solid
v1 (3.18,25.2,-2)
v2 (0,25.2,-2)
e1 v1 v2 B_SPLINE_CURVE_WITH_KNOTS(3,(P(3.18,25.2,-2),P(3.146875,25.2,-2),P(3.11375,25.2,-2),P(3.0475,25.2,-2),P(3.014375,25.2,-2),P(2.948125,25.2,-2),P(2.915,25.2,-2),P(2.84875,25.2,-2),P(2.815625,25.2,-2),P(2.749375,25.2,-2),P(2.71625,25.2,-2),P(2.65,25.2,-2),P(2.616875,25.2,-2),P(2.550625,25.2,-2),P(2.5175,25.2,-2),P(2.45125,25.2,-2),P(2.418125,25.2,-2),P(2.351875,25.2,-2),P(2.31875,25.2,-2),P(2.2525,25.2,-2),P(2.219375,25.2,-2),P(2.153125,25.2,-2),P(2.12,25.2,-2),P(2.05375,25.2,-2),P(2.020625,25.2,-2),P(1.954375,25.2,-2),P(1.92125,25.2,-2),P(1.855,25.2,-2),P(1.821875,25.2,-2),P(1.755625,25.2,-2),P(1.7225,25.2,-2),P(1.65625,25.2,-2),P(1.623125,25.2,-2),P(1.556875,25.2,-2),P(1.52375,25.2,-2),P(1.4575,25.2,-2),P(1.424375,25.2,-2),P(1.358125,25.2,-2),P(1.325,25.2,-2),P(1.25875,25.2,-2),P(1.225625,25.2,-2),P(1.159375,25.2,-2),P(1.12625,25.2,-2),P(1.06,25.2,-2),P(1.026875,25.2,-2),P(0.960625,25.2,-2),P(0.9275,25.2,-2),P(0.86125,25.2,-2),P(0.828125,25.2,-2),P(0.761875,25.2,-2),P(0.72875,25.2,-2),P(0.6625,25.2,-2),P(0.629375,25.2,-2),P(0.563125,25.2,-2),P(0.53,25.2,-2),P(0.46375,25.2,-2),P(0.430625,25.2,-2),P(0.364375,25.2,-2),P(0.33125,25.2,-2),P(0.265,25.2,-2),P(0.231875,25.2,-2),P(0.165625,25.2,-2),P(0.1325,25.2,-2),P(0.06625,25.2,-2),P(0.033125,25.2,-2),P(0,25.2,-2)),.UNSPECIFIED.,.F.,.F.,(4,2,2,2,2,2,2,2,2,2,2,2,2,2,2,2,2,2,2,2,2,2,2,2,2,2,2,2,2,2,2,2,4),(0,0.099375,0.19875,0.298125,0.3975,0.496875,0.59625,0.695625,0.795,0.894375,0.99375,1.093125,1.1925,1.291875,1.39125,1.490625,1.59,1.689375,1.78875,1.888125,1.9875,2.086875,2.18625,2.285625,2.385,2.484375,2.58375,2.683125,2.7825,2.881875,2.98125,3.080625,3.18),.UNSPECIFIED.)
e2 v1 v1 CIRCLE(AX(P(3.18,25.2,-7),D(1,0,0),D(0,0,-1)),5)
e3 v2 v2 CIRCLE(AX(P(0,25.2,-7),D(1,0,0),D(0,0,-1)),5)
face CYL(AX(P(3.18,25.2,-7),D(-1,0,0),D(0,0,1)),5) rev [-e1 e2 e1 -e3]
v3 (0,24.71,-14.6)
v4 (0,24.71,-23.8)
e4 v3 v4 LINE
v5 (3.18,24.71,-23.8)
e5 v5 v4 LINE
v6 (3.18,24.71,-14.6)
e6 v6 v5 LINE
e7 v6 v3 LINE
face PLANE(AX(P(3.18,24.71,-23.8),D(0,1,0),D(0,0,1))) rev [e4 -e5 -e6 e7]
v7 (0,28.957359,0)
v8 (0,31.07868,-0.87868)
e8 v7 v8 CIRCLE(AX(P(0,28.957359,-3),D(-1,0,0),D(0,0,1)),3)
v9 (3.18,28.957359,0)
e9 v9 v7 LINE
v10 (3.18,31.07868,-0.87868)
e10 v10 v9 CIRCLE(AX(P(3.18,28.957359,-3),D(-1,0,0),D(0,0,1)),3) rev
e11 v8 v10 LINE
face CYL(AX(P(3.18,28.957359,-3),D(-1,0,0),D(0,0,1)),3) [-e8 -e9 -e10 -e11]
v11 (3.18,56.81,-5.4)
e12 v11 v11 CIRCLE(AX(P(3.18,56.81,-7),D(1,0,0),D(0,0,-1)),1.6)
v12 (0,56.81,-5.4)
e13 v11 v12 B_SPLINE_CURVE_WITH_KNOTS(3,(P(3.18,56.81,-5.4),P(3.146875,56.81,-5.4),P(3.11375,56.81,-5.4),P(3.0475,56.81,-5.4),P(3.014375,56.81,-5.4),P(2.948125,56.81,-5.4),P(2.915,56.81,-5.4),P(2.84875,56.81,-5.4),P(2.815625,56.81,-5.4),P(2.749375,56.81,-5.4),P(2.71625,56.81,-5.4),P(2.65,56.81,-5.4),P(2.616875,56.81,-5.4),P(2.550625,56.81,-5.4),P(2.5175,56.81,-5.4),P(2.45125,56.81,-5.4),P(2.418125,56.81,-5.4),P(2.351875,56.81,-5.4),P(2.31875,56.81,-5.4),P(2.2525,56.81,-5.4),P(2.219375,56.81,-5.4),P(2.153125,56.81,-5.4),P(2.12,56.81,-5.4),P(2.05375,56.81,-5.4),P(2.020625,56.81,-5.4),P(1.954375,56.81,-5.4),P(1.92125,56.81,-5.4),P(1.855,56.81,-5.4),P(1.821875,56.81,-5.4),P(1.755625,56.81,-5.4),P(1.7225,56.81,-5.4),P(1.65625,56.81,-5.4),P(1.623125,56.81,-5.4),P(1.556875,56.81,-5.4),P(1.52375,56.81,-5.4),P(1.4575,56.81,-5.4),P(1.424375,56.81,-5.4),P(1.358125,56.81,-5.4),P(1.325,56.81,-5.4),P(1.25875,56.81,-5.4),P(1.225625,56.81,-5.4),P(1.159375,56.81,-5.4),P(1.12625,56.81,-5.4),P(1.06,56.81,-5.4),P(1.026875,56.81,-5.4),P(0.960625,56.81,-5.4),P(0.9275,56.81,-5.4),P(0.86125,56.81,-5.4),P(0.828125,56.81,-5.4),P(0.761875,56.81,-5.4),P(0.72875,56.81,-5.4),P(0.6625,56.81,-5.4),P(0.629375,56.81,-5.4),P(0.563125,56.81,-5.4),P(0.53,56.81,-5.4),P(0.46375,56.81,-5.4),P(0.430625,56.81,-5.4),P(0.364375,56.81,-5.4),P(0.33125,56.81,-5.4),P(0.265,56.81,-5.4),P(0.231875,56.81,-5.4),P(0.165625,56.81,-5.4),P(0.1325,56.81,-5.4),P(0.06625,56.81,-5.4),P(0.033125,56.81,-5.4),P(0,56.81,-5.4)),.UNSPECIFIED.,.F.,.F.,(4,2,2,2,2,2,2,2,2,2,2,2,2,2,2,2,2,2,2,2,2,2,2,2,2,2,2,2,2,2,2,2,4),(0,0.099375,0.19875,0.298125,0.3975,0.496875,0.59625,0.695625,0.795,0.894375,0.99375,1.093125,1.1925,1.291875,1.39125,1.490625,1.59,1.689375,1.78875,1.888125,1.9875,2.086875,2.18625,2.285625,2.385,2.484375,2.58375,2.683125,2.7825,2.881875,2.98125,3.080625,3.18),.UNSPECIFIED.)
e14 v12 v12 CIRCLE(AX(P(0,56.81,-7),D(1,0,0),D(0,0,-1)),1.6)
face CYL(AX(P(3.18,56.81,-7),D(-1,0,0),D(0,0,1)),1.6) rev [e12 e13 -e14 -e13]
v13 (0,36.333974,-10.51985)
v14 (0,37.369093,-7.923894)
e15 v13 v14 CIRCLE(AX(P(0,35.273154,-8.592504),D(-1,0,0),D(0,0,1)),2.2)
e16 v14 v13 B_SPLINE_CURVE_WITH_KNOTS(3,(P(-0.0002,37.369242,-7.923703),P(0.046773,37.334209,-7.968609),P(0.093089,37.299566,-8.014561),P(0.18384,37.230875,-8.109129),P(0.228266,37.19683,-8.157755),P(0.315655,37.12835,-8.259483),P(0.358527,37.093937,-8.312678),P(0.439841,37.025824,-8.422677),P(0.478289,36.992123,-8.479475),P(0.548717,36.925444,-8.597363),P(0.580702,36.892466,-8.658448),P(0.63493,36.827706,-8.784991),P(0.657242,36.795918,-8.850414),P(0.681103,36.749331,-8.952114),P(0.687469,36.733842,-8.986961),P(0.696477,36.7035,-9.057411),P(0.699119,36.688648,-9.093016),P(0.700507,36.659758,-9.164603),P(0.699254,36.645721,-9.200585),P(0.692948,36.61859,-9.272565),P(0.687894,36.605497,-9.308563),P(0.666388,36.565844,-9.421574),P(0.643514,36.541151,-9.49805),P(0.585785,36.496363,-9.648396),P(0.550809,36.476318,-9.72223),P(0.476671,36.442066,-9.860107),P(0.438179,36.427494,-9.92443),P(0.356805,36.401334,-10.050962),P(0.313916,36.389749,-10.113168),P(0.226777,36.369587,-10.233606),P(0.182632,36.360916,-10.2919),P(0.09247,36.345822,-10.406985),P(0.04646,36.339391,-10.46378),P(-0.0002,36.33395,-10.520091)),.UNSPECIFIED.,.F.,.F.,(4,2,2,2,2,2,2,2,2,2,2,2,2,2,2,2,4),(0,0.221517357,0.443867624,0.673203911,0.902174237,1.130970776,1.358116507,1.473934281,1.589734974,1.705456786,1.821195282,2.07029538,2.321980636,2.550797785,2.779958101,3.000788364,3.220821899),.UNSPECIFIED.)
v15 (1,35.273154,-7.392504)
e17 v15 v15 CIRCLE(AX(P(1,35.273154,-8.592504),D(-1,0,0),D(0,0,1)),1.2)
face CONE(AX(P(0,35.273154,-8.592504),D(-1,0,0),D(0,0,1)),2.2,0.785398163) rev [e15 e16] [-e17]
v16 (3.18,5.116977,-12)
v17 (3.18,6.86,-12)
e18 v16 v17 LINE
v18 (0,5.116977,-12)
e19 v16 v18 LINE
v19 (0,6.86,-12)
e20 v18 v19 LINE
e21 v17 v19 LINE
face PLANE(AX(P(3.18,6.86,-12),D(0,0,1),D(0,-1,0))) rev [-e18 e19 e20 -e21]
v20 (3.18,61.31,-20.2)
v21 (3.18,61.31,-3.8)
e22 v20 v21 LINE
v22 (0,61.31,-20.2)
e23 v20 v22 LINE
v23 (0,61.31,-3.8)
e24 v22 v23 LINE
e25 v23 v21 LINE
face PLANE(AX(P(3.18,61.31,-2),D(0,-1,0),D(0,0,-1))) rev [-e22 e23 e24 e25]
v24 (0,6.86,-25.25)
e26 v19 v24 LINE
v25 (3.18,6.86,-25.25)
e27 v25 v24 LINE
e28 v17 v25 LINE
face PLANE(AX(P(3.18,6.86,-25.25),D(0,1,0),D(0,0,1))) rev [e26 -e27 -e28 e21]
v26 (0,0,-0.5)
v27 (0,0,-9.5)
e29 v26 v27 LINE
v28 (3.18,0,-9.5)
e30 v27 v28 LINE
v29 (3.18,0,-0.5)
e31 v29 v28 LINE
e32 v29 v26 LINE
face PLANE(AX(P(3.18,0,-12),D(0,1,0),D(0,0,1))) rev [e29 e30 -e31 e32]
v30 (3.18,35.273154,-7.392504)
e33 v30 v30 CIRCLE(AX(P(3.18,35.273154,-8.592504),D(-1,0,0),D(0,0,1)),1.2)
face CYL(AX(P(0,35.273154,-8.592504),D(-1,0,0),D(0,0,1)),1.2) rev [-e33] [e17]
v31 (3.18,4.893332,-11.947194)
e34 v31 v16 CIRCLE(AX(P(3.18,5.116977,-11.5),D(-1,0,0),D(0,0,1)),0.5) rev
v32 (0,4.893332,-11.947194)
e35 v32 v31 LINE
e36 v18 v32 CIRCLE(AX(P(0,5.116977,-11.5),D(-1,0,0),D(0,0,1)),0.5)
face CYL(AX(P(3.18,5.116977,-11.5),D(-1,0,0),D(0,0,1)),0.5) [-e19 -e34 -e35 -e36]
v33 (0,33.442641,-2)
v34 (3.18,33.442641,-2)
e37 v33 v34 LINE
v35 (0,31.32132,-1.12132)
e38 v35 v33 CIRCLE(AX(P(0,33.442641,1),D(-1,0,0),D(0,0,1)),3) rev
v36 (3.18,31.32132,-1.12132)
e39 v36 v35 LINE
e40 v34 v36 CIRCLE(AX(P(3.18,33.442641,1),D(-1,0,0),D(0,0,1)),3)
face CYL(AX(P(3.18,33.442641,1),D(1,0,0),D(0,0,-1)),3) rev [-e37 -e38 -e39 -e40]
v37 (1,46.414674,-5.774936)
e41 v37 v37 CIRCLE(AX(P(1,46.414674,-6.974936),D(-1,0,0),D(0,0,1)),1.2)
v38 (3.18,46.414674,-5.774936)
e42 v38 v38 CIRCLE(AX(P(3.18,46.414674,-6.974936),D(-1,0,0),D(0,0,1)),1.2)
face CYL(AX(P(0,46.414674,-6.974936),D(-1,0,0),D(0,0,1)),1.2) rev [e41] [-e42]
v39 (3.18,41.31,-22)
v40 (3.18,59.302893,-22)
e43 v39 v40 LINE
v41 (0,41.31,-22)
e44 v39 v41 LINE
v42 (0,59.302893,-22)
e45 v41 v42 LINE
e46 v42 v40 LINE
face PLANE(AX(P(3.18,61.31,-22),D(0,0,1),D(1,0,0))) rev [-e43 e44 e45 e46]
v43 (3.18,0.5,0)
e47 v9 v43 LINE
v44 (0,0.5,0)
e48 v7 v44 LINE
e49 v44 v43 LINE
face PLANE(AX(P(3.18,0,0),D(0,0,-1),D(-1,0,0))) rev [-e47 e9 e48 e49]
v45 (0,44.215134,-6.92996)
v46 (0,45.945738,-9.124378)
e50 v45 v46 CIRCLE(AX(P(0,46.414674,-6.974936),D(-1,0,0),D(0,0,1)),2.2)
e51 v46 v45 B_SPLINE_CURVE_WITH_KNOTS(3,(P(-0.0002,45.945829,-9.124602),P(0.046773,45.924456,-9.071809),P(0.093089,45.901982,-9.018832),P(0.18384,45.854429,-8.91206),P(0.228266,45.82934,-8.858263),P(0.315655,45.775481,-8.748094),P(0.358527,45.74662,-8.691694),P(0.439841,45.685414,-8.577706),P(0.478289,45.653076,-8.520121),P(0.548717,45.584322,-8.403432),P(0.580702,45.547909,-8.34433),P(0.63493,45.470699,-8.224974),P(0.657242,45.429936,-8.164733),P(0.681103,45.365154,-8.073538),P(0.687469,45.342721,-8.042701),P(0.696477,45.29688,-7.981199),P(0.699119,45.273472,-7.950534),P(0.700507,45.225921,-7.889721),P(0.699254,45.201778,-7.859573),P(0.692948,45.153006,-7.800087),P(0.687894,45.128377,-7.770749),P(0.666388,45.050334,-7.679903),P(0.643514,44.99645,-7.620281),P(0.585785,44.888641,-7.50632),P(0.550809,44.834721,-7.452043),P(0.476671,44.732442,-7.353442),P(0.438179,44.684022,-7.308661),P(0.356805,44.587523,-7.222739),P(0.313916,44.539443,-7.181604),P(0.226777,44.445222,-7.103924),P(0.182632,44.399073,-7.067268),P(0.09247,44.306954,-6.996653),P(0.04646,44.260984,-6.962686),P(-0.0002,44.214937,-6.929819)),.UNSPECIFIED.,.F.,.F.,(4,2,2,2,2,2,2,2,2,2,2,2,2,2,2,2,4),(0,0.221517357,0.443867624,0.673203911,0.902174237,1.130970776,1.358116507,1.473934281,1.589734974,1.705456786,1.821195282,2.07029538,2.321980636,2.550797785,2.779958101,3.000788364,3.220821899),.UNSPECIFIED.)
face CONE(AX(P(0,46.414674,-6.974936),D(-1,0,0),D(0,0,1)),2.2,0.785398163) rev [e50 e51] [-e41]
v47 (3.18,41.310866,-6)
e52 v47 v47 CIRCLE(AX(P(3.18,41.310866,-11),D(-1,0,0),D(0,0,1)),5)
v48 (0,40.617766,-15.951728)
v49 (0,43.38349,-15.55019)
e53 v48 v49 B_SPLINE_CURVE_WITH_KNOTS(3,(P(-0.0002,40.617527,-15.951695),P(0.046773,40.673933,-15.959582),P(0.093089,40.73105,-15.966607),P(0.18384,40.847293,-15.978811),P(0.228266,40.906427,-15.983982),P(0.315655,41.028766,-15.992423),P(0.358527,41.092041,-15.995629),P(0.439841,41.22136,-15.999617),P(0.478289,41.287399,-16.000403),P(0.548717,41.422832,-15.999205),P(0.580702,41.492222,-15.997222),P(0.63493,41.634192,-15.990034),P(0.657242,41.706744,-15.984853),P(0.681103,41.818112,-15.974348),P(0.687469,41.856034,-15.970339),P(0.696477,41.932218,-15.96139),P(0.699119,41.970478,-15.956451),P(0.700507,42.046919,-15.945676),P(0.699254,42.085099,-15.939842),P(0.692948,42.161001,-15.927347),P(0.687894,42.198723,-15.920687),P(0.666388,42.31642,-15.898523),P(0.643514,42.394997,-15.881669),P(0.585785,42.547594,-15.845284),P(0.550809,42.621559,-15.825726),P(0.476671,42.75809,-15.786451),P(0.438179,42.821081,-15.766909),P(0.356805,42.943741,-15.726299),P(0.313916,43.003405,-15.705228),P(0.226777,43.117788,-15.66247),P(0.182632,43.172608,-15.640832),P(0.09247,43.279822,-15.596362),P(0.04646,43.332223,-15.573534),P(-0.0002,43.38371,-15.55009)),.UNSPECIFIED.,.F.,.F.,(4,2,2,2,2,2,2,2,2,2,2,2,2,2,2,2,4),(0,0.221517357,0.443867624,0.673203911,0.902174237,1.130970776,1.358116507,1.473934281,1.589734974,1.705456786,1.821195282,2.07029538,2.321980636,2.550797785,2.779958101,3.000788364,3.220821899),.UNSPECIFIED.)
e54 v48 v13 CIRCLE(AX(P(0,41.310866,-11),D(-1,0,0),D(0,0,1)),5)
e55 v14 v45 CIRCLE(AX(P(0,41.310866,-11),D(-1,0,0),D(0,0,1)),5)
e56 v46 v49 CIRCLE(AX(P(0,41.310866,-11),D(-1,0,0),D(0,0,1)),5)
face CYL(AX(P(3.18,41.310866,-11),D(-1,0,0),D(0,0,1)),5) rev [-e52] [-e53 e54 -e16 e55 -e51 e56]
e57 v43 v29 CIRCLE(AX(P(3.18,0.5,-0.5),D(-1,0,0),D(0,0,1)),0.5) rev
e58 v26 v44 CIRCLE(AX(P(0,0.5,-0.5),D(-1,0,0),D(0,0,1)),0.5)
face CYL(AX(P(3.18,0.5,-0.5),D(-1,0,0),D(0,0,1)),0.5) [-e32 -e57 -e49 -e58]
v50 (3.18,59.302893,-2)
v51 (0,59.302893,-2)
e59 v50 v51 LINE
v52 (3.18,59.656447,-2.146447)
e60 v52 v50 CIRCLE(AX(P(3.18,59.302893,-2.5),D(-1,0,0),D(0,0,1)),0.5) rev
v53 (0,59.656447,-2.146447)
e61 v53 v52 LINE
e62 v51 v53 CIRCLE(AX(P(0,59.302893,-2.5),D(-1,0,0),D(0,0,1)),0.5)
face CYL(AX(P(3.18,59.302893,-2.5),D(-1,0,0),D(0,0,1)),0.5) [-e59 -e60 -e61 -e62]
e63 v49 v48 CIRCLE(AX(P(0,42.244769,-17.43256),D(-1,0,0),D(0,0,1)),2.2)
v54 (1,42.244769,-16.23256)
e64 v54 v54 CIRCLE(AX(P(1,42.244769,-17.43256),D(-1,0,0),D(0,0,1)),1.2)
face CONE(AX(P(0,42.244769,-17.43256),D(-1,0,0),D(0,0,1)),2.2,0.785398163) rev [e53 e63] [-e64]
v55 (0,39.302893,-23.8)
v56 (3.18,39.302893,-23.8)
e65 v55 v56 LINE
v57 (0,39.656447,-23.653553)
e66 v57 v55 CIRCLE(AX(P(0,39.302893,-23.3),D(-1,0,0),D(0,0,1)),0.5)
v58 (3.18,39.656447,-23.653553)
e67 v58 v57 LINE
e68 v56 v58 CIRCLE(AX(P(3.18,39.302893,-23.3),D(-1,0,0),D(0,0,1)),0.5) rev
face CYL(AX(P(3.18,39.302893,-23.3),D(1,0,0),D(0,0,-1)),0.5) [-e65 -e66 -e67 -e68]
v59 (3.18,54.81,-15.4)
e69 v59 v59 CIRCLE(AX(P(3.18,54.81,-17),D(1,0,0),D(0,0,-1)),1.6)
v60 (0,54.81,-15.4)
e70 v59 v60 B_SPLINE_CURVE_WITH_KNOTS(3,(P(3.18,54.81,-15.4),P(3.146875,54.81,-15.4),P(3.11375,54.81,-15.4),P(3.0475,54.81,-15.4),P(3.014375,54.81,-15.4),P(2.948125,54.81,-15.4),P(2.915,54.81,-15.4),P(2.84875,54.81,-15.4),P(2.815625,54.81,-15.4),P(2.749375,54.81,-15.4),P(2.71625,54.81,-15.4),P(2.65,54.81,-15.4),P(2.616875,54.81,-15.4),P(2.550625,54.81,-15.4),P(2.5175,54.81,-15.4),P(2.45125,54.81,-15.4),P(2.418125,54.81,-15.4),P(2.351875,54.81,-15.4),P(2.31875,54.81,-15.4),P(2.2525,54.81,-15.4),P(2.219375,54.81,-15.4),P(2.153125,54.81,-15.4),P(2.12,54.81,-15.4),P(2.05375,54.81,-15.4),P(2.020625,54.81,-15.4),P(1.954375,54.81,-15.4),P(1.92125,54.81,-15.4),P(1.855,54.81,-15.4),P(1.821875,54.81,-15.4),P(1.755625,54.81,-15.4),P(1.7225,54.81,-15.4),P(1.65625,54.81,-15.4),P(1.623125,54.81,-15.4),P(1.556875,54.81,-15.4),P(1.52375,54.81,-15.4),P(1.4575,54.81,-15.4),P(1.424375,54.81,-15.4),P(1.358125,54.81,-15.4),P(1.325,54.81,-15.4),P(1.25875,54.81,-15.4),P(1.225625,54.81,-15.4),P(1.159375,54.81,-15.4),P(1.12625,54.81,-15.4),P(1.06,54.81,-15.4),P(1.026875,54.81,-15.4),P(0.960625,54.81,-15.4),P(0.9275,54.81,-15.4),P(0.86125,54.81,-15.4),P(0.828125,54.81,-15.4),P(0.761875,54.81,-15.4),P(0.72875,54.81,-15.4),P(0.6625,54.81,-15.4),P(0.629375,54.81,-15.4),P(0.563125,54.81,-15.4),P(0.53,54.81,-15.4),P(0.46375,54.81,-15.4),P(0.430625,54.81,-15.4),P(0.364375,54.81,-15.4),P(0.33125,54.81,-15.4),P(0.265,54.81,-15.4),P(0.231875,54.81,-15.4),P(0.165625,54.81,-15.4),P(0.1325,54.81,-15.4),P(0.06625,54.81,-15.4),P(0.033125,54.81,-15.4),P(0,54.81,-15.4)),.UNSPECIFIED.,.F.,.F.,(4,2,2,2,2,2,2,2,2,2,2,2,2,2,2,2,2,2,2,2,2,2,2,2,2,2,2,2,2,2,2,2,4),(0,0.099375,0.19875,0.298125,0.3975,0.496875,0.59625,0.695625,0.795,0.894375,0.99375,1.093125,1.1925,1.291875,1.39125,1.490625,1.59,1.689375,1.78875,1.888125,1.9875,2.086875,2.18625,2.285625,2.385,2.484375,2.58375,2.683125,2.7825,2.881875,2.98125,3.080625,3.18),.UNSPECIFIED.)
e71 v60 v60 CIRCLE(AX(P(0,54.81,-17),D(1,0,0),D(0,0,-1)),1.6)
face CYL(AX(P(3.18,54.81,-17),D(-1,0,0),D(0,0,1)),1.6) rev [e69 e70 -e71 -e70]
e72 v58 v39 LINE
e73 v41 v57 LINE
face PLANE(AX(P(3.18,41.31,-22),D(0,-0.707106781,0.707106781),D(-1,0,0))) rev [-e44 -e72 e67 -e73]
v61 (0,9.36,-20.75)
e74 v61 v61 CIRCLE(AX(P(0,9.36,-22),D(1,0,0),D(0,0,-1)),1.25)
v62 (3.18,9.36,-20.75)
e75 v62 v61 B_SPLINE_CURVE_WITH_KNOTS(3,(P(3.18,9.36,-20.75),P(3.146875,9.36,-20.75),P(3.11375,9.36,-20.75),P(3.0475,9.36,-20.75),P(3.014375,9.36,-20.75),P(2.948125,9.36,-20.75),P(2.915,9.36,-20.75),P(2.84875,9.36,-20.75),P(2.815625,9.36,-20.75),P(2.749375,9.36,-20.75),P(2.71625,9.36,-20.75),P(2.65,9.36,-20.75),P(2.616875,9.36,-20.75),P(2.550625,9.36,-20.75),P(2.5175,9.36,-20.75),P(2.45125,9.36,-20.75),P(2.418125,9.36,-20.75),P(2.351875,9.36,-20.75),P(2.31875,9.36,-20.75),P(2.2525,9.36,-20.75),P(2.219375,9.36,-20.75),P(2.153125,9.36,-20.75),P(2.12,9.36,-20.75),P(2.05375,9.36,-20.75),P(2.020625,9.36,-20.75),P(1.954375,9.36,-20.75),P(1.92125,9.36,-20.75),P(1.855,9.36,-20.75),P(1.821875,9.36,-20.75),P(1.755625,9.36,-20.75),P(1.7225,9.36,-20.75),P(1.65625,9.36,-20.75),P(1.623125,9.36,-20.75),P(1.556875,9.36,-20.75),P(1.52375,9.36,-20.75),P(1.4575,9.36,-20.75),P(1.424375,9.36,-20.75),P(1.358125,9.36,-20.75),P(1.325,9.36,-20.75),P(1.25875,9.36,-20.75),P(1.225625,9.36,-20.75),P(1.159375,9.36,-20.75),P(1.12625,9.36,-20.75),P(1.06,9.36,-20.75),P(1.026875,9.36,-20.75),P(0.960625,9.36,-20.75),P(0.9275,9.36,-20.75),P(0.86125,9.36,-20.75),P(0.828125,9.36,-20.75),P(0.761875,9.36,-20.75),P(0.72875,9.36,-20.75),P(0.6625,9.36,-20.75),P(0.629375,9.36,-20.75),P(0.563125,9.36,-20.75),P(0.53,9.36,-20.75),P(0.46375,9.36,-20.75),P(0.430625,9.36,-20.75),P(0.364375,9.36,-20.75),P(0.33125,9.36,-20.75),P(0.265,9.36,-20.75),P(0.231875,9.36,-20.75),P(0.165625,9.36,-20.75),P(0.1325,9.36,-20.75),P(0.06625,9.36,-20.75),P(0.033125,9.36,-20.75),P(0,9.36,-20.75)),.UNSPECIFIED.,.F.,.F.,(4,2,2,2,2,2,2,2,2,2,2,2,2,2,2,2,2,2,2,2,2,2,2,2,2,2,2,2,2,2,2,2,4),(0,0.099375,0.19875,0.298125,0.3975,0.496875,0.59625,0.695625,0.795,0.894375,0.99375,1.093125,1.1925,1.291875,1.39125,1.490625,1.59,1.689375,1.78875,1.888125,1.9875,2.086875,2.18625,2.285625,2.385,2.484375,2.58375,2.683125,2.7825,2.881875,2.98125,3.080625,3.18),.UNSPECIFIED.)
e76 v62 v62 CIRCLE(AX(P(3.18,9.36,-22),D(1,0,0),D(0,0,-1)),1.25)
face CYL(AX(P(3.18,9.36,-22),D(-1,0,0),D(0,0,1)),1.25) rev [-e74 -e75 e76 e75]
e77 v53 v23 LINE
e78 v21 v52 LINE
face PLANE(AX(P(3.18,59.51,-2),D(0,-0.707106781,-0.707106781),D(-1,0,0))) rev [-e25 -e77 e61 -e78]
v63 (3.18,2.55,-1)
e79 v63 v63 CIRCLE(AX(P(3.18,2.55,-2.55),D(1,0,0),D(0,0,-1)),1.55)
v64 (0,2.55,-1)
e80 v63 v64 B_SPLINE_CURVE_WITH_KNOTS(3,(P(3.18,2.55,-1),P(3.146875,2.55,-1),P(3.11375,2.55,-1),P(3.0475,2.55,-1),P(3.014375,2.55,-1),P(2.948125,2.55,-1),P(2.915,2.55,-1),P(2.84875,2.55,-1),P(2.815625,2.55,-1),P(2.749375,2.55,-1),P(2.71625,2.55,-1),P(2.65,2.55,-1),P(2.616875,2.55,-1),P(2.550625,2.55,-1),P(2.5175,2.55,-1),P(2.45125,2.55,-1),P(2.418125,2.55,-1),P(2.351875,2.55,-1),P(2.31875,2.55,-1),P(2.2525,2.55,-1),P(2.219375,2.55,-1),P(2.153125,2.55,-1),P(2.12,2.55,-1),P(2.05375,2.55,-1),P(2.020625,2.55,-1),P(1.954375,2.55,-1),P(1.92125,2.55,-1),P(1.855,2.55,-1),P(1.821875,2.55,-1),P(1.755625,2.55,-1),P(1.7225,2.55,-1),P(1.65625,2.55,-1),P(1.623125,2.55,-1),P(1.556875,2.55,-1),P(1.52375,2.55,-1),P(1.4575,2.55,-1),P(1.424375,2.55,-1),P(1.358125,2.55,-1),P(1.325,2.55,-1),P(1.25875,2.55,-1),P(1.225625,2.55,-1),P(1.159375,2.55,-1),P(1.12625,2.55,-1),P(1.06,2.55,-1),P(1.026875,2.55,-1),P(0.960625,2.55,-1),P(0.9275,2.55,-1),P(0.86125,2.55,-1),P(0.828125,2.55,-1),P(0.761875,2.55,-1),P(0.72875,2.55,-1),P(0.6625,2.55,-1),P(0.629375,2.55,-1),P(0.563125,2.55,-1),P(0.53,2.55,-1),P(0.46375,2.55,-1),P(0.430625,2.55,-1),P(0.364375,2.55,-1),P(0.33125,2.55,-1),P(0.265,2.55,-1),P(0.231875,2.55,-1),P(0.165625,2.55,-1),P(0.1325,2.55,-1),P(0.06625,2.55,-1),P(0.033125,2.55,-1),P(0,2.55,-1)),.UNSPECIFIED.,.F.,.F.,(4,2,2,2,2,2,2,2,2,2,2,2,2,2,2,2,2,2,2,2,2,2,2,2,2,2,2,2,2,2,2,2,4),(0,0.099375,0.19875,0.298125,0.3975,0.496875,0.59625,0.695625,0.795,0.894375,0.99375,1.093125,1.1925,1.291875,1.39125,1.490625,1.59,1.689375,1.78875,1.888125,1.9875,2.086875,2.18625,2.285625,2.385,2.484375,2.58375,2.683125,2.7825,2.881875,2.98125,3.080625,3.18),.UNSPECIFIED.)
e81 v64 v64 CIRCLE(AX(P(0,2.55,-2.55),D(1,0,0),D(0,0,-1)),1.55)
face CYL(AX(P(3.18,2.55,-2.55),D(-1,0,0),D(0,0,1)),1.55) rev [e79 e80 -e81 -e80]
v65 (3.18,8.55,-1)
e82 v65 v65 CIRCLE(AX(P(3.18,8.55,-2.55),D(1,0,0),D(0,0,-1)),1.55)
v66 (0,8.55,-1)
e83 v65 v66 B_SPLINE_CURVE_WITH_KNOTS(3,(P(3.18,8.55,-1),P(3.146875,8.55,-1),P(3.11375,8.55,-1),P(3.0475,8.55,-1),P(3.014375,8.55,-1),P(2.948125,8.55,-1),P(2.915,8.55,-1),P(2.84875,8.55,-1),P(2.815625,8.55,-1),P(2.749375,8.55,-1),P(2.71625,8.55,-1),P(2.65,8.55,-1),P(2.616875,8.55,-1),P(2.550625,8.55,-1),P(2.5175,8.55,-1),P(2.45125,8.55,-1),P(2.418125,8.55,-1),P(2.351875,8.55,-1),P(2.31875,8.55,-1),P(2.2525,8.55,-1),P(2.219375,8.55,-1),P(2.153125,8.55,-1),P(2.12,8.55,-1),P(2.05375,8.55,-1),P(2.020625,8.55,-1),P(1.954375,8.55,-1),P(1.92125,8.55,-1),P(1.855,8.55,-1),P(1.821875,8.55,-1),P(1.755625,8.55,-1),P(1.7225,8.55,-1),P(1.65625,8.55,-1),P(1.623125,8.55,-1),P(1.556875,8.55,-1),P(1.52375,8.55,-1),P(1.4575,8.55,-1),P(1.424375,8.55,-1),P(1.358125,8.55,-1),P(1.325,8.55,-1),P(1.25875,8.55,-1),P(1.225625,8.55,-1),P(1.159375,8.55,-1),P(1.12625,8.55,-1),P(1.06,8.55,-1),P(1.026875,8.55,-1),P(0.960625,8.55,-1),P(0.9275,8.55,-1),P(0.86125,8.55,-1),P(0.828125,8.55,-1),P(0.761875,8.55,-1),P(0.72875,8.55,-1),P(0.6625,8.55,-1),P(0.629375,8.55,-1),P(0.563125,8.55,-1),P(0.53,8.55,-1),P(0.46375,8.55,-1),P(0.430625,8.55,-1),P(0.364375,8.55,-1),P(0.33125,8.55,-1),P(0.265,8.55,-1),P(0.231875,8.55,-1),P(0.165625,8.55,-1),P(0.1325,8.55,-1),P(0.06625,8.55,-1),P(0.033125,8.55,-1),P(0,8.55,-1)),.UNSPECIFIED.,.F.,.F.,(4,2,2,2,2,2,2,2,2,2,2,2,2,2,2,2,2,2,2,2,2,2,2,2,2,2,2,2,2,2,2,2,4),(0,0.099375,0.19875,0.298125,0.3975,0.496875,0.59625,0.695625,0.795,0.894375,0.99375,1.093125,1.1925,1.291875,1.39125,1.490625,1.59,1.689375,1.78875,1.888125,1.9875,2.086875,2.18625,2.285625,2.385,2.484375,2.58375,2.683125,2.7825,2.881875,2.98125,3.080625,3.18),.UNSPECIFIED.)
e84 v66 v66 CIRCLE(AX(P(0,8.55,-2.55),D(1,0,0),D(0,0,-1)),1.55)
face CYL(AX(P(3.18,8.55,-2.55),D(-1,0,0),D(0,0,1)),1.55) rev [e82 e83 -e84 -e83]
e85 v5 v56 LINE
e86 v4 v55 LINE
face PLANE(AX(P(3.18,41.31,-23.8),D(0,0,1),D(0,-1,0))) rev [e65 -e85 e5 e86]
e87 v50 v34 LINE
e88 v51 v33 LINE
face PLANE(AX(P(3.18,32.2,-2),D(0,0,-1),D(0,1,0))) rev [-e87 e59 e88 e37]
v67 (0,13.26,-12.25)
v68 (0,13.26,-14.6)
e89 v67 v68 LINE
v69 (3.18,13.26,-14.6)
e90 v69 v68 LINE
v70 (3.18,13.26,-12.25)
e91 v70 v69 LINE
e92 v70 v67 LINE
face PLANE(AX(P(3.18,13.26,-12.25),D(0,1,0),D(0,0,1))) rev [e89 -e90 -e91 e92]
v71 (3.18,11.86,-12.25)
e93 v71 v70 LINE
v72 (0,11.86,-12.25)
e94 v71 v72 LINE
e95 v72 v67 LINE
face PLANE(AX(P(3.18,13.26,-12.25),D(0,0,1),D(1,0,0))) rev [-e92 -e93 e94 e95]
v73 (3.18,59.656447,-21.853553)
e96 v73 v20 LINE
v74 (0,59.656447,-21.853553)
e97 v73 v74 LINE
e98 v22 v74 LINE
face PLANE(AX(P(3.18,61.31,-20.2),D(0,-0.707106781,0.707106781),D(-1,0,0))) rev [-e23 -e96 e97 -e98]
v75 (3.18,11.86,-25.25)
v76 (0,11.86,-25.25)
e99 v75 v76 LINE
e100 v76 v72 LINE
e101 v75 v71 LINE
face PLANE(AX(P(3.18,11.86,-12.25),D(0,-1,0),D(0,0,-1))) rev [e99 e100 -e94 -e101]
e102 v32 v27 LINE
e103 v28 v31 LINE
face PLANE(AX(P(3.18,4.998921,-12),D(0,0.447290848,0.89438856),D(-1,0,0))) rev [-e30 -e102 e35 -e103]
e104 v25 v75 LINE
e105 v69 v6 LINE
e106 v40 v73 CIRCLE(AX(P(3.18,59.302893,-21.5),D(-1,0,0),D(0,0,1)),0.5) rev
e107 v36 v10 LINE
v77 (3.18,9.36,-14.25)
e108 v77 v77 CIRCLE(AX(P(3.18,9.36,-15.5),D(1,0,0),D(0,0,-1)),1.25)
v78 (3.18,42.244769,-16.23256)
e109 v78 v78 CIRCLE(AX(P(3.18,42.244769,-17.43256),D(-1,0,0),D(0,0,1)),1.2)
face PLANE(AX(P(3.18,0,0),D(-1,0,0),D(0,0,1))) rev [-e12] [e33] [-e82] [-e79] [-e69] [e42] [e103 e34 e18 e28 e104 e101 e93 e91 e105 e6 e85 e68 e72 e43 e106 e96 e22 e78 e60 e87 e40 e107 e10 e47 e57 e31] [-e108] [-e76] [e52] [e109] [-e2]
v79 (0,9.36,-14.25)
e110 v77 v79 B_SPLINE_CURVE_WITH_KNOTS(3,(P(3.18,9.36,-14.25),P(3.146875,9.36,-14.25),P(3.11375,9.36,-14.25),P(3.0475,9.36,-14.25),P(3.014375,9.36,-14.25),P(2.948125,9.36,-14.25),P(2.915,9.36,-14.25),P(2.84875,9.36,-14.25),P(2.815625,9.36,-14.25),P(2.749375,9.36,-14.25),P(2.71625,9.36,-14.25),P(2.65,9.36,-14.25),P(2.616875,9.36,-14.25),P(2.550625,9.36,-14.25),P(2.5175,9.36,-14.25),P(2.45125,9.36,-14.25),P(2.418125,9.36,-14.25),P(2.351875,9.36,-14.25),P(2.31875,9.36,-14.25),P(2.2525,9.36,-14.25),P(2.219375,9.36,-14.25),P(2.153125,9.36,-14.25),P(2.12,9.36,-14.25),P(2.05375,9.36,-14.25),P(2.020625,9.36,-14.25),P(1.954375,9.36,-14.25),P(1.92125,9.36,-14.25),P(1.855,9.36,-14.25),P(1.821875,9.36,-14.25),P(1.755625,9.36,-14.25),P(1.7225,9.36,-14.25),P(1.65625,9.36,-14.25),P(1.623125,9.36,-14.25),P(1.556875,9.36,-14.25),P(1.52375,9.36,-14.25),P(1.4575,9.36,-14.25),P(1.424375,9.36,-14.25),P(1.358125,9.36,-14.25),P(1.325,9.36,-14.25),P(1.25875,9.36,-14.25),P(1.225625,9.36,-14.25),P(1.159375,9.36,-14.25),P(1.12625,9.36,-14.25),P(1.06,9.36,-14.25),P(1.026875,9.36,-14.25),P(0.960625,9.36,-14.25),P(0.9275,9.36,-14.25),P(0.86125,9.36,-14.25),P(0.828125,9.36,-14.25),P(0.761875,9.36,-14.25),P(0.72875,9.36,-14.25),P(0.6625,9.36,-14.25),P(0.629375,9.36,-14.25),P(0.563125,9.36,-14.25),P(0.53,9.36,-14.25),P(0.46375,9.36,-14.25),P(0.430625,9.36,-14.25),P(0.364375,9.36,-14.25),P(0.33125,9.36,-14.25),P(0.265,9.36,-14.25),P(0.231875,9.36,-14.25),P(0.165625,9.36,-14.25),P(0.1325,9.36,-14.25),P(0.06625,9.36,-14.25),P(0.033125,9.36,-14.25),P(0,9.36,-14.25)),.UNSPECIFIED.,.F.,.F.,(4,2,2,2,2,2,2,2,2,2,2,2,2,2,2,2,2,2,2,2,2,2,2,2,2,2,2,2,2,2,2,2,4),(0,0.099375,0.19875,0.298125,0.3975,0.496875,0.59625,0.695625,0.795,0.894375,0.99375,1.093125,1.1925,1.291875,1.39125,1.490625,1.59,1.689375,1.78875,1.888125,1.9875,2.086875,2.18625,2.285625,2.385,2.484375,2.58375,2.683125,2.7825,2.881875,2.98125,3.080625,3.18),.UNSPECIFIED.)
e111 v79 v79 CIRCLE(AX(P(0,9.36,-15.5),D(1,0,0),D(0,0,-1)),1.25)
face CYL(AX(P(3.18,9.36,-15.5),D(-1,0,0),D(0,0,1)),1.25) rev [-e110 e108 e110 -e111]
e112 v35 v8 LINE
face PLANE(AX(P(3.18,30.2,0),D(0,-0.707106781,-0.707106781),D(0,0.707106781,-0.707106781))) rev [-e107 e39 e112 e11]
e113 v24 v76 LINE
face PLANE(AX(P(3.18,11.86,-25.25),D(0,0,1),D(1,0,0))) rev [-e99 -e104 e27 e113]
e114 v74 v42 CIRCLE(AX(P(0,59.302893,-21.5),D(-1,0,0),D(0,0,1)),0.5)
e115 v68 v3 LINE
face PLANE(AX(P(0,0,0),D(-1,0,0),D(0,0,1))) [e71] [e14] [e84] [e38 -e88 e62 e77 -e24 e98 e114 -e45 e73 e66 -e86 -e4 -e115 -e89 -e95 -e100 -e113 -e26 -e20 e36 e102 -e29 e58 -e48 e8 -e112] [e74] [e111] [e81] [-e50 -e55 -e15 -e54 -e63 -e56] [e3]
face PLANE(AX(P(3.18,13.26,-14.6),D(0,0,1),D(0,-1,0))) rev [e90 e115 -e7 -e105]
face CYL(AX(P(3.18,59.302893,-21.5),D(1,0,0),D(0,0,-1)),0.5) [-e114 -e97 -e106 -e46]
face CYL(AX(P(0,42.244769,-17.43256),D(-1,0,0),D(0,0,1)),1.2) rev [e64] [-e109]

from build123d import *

# Parameters (mm, degrees)
SKETCH1_R                                       = 5
SKETCH1_R_2                                     = 1.6
SKETCH1_R_3                                     = 1.25
SKETCH1_R_4                                     = 1.55
BOSS_EXTRUDE1_DEPTH                             = 3.18
CHAMFER1_SIZE                                   = 2.5
CHAMFER1_SIZE2                                  = 4.998920521
CSK_FOR_M2_FLAT_HEAD_MACHINE_SCREW1_D           = 2.4
CSK_FOR_M2_FLAT_HEAD_MACHINE_SCREW1_DEPTH       = 3.508967257
CSK_FOR_M2_FLAT_HEAD_MACHINE_SCREW1_CSINK_D     = 4.4
CSK_FOR_M2_FLAT_HEAD_MACHINE_SCREW1_CSINK_ANGLE = 90
CSK_FOR_M2_FLAT_HEAD_MACHINE_SCREW1_TIP         = 0.721032743
SKETCH3_R                                       = 5
CUT_EXTRUDE4_DEPTH                              = 67.382158748
FILLET2_R                                       = 3
CHAMFER2_SIZE                                   = 1.8
FILLET4_R                                       = 0.5


with BuildPart() as part:
    # Sketch1 → Boss-Extrude1 (new body)
    with BuildSketch(Plane(origin=(0, 0, 0), x_dir=(0, 0, -1), z_dir=(1, 0, 0))):
        Polygon((0, 0), (0, 30.2), (2, 32.2), (2, 61.31), (22, 61.31), (22, 41.31), (23.8, 41.31), (23.8, 24.71), (14.6, 24.71), (14.6, 13.26), (12.25, 13.26), (12.25, 11.86), (25.25, 11.86), (25.25, 6.86), (12, 6.86), (12, 0), align=None)
        with Locations(Location((7, 25.2, 0), (0, 0, 180))):
            Circle(SKETCH1_R, mode=Mode.SUBTRACT)
        with Locations(Location((7, 56.81, 0), (0, 0, 180))):
            Circle(SKETCH1_R_2, mode=Mode.SUBTRACT)
        with Locations(Location((17, 54.81, 0), (0, 0, 180))):
            Circle(SKETCH1_R_2, mode=Mode.SUBTRACT)
        with Locations(Location((22, 9.36, 0), (0, 0, 180))):
            Circle(SKETCH1_R_3, mode=Mode.SUBTRACT)
        with Locations(Location((15.5, 9.36, 0), (0, 0, 180))):
            Circle(SKETCH1_R_3, mode=Mode.SUBTRACT)
        with Locations(Location((2.55, 2.55, 0), (0, 0, 180))):
            Circle(SKETCH1_R_4, mode=Mode.SUBTRACT)
        with Locations(Location((2.55, 8.55, 0), (0, 0, 180))):
            Circle(SKETCH1_R_4, mode=Mode.SUBTRACT)
    extrude(amount=BOSS_EXTRUDE1_DEPTH)

    # Chamfer1
    chamfer1_edges = [part.edges().sort_by_distance(p)[0] for p in [
        (1.59, 0, -12),
    ]]
    chamfer1_side = [part.faces().sort_by_distance(p)[0] for p in [
        (1.59, 0, -6),
    ]]
    chamfer(chamfer1_edges, length=CHAMFER1_SIZE, length2=CHAMFER1_SIZE2, reference=chamfer1_side[0])

    # CSK for M2 Flat Head Machine Screw1
    with Locations(Plane.ZY):
        with Locations((-6.974936087, 46.414674329), (-17.432559713, 42.244769284), (-8.592504199, 35.273154083)):
            CounterSinkHole(CSK_FOR_M2_FLAT_HEAD_MACHINE_SCREW1_D / 2, CSK_FOR_M2_FLAT_HEAD_MACHINE_SCREW1_CSINK_D / 2, depth=CSK_FOR_M2_FLAT_HEAD_MACHINE_SCREW1_DEPTH, counter_sink_angle=CSK_FOR_M2_FLAT_HEAD_MACHINE_SCREW1_CSINK_ANGLE)
            with Locations((0, 0, -(CSK_FOR_M2_FLAT_HEAD_MACHINE_SCREW1_DEPTH + CSK_FOR_M2_FLAT_HEAD_MACHINE_SCREW1_TIP / 2))):  # 118° drill point
                Cone(0, CSK_FOR_M2_FLAT_HEAD_MACHINE_SCREW1_D / 2, CSK_FOR_M2_FLAT_HEAD_MACHINE_SCREW1_TIP, mode=Mode.SUBTRACT)

    # Sketch3 → Cut-Extrude4 (cut, through all)
    with BuildSketch(Plane.ZY):
        with Locations((-11, 41.310865899)):
            Circle(SKETCH3_R)
    extrude(amount=-CUT_EXTRUDE4_DEPTH, mode=Mode.SUBTRACT)

    # Fillet2
    fillet2_edges = [part.edges().sort_by_distance(p)[0] for p in [
        (1.59, 30.2, 0),
        (1.59, 32.2, -2),
    ]]
    fillet(fillet2_edges, radius=FILLET2_R)

    # Chamfer2
    chamfer2_edges = [part.edges().sort_by_distance(p)[0] for p in [
        (1.59, 61.31, -22),
        (1.59, 61.31, -2),
        (1.59, 41.31, -23.8),
    ]]
    chamfer(chamfer2_edges, length=CHAMFER2_SIZE - 0.0001)  # a hair under: the kernel refuses the full size

    # Fillet4
    fillet4_edges = [part.edges().sort_by_distance(p)[0] for p in [
        (1.59, 39.5101, -23.8),
        (1.59, 59.5101, -22),
        (1.59, 59.5101, -2),
        (1.59, 0, 0),
        (1.59, 4.998920521, -12),
    ]]
    fillet(fillet4_edges, radius=FILLET4_R)


solid = part.part
